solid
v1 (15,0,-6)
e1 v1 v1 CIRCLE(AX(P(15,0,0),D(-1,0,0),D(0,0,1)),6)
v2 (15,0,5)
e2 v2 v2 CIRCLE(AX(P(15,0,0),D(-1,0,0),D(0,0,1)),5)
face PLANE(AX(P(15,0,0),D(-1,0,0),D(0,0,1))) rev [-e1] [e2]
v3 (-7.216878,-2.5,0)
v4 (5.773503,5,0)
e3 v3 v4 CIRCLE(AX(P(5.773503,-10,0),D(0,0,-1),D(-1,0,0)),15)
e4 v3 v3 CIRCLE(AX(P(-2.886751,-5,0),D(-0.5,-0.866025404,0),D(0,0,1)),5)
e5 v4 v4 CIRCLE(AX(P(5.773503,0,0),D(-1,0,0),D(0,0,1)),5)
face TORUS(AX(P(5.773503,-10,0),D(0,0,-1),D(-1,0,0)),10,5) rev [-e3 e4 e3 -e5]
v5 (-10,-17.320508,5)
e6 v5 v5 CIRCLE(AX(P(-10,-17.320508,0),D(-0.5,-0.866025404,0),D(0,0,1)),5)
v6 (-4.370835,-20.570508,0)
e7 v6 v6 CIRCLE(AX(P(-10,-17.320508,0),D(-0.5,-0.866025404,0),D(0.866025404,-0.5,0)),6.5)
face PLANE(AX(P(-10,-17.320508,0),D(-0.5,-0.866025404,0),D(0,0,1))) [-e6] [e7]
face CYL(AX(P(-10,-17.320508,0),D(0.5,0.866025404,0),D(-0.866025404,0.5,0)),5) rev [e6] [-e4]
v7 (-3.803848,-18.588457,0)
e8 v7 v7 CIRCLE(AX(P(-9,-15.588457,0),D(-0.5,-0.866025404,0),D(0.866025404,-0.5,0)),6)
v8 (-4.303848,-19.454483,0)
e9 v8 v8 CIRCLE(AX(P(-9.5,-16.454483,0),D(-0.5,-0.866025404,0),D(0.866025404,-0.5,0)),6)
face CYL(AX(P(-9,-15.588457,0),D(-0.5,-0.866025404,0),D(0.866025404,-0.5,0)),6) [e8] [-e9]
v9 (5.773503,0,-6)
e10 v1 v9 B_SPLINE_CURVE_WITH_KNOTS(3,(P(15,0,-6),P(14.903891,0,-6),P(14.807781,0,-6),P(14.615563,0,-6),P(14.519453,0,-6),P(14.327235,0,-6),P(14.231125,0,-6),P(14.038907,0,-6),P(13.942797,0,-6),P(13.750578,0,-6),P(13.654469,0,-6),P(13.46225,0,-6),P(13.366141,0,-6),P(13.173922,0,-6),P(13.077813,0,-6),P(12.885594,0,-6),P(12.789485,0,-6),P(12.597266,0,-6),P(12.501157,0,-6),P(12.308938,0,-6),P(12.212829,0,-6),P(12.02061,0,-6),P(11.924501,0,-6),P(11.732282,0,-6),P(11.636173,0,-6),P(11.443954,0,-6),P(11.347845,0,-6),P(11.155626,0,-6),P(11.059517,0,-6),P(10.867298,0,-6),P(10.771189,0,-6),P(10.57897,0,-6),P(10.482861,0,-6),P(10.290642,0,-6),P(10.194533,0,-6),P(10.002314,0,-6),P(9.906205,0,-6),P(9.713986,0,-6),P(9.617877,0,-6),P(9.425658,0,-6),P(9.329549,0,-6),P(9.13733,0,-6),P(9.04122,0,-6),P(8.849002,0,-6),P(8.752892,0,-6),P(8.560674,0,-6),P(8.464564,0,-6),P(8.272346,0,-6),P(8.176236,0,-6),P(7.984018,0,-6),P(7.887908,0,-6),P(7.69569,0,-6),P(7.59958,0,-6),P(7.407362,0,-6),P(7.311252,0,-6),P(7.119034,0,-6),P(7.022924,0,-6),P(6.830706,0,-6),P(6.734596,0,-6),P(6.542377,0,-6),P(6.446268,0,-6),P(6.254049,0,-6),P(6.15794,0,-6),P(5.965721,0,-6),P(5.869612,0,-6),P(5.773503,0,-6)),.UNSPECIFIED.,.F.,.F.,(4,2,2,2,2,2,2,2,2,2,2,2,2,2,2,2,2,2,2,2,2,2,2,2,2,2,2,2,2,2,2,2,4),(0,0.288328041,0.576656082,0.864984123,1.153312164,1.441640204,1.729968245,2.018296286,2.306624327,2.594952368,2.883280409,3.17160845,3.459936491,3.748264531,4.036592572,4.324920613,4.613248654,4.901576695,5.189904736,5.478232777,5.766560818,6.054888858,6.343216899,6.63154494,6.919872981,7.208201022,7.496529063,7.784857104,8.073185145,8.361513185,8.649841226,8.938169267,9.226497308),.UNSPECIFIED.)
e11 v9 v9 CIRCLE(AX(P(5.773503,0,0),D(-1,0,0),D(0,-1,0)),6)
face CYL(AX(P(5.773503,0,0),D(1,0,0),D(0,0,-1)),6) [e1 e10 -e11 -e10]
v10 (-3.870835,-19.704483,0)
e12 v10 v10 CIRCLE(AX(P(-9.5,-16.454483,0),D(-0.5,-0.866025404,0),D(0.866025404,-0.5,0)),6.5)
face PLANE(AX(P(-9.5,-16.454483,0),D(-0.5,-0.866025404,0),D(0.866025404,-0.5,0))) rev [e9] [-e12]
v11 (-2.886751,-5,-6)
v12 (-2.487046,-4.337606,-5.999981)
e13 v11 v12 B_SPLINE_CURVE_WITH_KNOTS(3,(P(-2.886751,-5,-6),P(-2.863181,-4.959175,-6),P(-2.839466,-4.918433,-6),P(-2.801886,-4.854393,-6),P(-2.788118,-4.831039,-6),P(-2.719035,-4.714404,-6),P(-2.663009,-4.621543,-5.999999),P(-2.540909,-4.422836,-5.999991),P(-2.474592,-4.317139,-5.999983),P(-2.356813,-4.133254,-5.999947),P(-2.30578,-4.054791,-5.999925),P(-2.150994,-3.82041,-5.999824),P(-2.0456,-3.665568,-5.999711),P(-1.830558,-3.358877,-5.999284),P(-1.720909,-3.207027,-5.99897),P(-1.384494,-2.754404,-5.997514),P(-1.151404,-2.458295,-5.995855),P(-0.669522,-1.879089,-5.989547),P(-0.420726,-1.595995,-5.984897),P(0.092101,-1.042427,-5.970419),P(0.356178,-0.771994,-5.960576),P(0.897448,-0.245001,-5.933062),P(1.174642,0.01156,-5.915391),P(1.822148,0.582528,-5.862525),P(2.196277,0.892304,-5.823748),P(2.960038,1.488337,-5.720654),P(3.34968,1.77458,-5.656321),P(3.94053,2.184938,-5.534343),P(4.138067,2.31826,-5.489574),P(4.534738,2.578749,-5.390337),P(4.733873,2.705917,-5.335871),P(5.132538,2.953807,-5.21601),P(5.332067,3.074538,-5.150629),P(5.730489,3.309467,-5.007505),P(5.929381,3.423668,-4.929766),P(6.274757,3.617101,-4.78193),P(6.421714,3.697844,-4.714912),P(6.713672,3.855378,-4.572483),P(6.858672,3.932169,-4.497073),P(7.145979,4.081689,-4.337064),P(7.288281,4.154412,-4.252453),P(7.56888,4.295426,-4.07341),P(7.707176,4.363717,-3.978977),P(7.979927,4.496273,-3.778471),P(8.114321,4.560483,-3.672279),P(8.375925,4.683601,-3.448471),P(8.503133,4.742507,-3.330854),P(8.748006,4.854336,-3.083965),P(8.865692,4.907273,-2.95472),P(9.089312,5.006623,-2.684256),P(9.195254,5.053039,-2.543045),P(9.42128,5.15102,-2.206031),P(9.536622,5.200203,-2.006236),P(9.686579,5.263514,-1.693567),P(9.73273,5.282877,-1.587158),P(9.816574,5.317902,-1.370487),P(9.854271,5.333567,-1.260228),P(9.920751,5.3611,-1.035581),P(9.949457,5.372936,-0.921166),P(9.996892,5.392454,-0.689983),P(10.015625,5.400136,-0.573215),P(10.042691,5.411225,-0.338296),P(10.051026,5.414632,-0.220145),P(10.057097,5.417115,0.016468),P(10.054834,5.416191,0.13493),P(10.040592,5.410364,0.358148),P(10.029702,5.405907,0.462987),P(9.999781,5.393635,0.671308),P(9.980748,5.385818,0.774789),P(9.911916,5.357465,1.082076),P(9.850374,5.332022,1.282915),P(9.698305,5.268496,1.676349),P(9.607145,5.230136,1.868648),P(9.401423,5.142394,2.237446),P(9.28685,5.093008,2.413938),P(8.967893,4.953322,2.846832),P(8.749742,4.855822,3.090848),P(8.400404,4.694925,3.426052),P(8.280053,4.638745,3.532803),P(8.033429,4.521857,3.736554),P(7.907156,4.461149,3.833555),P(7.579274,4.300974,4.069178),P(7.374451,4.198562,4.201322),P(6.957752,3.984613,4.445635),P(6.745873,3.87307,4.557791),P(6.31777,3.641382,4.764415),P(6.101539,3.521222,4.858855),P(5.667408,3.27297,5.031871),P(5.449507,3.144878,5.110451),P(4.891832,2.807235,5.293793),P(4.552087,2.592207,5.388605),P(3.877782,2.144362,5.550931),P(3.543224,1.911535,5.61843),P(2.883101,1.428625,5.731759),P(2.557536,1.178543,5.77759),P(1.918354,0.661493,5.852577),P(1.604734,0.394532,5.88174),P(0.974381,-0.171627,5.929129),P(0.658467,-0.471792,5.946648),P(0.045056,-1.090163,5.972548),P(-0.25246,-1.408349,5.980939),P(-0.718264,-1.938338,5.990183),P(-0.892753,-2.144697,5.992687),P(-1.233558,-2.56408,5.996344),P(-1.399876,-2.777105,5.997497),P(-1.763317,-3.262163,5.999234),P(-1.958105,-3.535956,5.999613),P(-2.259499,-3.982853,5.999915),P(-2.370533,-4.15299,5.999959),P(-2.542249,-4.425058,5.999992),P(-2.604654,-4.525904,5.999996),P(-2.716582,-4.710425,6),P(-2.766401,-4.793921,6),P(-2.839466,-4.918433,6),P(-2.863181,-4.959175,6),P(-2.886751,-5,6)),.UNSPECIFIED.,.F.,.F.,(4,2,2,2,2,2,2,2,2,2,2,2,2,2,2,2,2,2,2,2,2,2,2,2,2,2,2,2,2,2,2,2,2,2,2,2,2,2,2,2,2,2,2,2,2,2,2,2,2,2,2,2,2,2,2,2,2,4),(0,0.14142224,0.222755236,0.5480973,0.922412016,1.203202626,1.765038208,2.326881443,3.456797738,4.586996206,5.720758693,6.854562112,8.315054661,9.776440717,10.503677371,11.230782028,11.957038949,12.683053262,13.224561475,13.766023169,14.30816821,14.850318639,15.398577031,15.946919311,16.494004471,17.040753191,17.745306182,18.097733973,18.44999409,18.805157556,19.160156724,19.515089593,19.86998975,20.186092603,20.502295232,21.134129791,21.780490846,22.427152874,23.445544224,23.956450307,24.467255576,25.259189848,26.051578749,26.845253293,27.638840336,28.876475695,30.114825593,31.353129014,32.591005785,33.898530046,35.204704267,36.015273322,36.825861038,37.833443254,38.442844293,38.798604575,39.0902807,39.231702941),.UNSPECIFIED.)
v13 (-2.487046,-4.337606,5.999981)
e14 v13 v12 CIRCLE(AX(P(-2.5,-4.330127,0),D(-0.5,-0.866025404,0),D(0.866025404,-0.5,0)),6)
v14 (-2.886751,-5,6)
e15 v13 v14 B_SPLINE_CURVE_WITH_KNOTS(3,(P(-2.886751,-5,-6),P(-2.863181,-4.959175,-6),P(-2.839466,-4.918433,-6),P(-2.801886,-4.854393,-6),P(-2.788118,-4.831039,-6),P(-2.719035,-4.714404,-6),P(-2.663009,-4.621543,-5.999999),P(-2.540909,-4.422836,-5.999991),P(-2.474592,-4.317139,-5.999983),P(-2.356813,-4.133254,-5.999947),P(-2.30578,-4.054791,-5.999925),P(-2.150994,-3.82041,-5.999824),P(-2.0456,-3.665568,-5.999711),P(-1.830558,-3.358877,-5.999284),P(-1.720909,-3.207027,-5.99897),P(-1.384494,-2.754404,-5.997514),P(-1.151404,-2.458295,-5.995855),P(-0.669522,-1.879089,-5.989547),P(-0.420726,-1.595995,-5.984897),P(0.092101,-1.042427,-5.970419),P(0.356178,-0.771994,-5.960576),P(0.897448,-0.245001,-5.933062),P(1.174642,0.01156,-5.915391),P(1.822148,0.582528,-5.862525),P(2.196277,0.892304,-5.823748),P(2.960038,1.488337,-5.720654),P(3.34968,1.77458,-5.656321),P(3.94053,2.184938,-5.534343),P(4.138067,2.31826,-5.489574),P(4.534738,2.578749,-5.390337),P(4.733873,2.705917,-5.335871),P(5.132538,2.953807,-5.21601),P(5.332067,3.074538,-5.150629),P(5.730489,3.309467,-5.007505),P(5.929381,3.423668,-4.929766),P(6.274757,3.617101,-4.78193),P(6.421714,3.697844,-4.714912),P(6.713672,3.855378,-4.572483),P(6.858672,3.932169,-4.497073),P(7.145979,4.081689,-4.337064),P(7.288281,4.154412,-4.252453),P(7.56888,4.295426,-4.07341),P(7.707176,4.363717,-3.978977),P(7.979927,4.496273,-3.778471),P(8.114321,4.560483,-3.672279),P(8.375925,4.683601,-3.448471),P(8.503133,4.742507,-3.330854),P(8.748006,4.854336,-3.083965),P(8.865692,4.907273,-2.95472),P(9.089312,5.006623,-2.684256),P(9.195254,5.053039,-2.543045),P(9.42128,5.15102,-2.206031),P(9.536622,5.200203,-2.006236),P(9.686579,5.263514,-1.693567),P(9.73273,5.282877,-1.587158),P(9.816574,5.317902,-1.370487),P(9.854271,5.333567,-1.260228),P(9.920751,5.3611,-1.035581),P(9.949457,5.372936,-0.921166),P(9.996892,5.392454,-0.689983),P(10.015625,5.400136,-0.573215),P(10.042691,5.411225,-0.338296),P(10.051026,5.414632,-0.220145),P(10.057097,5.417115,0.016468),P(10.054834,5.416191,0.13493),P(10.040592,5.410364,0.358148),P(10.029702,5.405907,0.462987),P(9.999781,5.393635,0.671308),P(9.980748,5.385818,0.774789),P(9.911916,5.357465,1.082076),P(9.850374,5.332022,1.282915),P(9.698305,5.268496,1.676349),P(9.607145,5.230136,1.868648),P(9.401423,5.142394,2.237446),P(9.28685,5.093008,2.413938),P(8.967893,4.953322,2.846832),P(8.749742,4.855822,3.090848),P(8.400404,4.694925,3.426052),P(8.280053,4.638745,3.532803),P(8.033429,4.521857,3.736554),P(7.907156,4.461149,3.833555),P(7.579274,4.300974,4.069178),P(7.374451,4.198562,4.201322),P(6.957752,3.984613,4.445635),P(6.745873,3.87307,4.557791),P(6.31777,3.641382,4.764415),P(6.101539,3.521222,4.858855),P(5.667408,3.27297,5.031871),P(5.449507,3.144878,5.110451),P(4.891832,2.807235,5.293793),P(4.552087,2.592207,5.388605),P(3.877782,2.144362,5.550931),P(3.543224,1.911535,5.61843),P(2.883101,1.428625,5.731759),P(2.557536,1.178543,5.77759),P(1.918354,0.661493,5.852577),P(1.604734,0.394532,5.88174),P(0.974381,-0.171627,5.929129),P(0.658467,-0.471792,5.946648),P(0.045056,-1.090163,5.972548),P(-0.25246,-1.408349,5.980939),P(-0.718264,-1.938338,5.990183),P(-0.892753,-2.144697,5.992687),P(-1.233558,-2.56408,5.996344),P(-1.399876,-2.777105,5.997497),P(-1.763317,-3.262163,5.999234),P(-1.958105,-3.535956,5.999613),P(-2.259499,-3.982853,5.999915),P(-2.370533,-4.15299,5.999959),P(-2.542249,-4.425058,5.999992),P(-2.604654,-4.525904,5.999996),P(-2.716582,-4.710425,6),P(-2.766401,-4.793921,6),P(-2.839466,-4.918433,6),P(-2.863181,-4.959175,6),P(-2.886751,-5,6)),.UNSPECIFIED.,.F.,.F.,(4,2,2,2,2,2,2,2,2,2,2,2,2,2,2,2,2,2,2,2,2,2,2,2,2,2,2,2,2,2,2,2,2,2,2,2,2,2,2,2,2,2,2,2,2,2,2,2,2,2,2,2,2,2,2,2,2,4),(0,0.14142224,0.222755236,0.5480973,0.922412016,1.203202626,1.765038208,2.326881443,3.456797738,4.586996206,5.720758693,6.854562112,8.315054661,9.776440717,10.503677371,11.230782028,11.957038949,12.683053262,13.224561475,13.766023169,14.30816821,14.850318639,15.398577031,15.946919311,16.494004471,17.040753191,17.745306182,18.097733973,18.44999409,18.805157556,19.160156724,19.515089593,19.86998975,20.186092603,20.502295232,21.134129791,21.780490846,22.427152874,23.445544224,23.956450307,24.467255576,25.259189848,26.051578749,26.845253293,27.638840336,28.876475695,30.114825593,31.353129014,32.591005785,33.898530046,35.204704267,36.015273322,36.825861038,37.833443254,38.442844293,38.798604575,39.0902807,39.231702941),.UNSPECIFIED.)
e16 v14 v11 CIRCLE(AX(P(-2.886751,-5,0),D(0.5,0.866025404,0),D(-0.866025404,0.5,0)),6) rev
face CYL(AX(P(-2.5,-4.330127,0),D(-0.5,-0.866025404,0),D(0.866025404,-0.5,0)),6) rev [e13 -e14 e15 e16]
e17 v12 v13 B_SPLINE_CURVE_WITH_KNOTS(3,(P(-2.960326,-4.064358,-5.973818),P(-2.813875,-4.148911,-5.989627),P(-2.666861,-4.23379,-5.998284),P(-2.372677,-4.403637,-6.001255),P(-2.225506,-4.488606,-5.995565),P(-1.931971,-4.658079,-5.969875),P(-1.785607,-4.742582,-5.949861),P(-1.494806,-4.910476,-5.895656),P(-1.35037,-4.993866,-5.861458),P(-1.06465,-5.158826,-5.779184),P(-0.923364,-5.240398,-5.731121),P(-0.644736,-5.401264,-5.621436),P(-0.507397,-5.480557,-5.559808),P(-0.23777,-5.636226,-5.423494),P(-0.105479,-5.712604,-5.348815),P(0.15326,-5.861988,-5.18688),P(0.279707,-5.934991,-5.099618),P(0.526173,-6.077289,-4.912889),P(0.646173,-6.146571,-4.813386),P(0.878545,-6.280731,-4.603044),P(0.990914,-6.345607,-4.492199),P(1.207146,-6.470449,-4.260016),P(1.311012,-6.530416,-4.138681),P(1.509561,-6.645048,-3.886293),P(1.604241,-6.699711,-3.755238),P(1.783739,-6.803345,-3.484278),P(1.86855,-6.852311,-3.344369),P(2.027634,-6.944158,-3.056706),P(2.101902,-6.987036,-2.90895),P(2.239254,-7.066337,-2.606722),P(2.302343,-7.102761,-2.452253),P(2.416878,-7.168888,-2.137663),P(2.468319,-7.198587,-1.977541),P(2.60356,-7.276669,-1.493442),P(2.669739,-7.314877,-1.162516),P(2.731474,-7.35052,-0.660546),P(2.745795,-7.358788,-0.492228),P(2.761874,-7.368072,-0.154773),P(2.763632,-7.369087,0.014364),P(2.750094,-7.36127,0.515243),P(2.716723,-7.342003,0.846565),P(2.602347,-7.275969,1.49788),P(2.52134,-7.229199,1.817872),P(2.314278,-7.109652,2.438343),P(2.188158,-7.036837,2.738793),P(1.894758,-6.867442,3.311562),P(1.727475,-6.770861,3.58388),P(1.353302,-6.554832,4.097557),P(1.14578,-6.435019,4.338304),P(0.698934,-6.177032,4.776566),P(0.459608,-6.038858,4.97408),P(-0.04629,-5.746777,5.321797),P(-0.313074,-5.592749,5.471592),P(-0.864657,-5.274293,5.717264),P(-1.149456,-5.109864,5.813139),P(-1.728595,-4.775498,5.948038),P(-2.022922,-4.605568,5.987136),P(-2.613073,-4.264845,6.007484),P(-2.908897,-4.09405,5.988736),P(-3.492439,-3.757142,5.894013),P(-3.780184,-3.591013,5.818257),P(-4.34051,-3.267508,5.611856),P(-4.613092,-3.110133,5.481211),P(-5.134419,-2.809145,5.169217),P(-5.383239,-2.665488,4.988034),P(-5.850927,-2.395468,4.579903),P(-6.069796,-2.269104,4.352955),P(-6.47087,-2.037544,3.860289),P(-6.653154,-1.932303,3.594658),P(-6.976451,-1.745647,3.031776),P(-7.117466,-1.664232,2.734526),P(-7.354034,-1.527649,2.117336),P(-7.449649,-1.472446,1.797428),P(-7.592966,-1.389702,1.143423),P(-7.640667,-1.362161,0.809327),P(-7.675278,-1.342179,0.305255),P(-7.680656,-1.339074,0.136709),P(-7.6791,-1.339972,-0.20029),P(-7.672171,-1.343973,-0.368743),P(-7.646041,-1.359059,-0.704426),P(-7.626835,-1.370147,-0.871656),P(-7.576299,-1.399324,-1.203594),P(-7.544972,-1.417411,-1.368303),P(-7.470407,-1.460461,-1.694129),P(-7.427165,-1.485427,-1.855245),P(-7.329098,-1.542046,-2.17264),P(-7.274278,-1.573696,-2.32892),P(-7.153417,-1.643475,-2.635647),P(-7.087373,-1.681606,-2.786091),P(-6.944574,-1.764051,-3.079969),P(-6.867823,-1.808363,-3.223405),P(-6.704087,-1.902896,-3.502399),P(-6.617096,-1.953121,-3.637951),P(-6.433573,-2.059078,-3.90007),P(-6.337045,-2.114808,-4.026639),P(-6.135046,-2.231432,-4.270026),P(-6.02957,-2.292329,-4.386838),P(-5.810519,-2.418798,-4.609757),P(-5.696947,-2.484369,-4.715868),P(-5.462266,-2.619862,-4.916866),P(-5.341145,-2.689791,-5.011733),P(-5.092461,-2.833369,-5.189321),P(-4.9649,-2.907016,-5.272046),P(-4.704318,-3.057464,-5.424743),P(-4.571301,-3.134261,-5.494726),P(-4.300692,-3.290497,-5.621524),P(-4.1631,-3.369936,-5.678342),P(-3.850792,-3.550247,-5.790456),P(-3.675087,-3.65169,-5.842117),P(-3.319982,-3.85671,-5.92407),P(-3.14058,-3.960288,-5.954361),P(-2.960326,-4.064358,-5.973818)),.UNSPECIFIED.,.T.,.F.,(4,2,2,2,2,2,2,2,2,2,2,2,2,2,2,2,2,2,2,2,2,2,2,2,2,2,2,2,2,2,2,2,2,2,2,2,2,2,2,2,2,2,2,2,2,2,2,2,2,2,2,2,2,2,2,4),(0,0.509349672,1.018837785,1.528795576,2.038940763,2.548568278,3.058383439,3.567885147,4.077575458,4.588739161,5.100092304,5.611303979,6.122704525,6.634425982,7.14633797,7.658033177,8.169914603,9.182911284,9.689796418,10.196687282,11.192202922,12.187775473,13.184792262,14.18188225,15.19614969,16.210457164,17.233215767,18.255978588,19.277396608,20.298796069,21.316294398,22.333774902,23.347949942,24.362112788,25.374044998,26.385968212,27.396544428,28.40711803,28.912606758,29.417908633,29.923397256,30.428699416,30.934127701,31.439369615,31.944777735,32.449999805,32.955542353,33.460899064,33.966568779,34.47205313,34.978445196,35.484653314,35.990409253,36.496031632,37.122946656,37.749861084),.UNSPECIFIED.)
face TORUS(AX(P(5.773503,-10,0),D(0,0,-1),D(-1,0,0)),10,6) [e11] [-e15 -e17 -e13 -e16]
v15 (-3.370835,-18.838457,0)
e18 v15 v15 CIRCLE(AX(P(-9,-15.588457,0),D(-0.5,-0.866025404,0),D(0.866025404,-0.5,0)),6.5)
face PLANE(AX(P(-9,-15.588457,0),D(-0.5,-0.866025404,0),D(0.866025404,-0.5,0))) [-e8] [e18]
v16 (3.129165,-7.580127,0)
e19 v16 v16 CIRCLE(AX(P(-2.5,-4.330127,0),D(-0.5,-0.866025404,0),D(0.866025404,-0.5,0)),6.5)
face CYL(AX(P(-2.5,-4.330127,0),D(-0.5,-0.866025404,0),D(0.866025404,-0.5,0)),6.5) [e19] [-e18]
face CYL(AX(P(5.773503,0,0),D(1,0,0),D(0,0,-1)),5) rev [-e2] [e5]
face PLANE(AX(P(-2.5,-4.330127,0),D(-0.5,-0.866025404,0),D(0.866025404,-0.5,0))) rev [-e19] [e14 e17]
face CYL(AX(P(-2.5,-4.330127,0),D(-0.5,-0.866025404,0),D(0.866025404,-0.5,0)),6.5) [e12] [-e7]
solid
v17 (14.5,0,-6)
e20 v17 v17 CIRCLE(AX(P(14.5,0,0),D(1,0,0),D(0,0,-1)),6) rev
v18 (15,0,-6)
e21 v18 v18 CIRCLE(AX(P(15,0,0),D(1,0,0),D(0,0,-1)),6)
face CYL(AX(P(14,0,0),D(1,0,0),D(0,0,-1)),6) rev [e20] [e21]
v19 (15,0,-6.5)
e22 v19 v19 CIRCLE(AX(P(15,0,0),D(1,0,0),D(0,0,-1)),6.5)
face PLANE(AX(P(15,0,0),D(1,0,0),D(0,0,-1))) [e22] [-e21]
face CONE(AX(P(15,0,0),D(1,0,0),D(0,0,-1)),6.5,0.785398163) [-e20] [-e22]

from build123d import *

# Parameters (mm, degrees)
SWEEP_THIN1_PROFILE_R   = 6
SWEEP_THIN1_PROFILE_R_2 = 5
BOSS_EXTRUDE1_START     = -15
SKETCH17_R              = 6.5
SKETCH17_R_2            = 6
BOSS_EXTRUDE1_DEPTH     = 15
CUT_EXTRUDE1_START      = -2
SKETCH17_3_R            = 6.5
SKETCH17_3_R_2          = 6
CUT_EXTRUDE1_DEPTH      = 1
SKETCH18_R              = 6.5
SKETCH18_R_2            = 6
BOSS_EXTRUDE2_DEPTH     = 1


with BuildPart() as part:
    # Sweep-Thin1: sweep along a path in Sketch1
    with BuildLine(Plane.XY) as sweep_thin1_path:
        Line((-10, -17.320508076), (-2.886751346, -5))
        ThreePointArc((-2.886751346, -5), (0.773502692, -1.339745962), (5.773502692, 0))
        Line((5.773502692, 0), (15, 0))
    # Sweep-Thin1 profile (on start of the path) → Sweep-Thin1 (sweep)
    with BuildSketch(Plane(origin=(-10, -17.320508076, 0), x_dir=(0.8660254037844363, -0.5000000000000041, 0), z_dir=(0.5000000000000041, 0.8660254037844363, 0))):
        Circle(SWEEP_THIN1_PROFILE_R)
        Circle(SWEEP_THIN1_PROFILE_R_2, mode=Mode.SUBTRACT)
    sweep(path=sweep_thin1_path.line)

    # Sketch17 → Boss-Extrude1 (add)
    with BuildSketch(Plane(origin=(-10, -17.320508076, 0), x_dir=(0.8660254037844363, -0.5000000000000042, 0), z_dir=(-0.5000000000000041, -0.8660254037844362, 0)).offset(BOSS_EXTRUDE1_START)):
        Circle(SKETCH17_R)
        Circle(SKETCH17_R_2, mode=Mode.SUBTRACT)
    extrude(amount=BOSS_EXTRUDE1_DEPTH)

    # Sketch17<3> → Cut-Extrude1 (cut)
    with BuildSketch(Plane(origin=(-10, -17.320508076, 0), x_dir=(0.8660254037844363, -0.5000000000000042, 0), z_dir=(-0.5000000000000041, -0.8660254037844362, 0)).offset(CUT_EXTRUDE1_START)):
        Circle(SKETCH17_3_R)
        Circle(SKETCH17_3_R_2, mode=Mode.SUBTRACT)
    extrude(amount=CUT_EXTRUDE1_DEPTH, mode=Mode.SUBTRACT)


with BuildPart() as body_2:
    # Sketch18 → Boss-Extrude2 (new body)
    with BuildSketch(Plane(origin=(15, 0, 0), x_dir=(0, 0, -1), z_dir=(1, 0, 0))):
        Circle(SKETCH18_R)
        Circle(SKETCH18_R_2, mode=Mode.SUBTRACT)
    extrude(amount=-BOSS_EXTRUDE2_DEPTH)

    # Chamfer1: read off the stored shape, not the designer's step
    # Chamfer1 outline → Chamfer1 (revolve, cut)
    with BuildSketch(Plane.YX):
        Polygon((6.5, 15), (6, 14.5), (6, 14), (6.5, 14), align=None)
    revolve(axis=Axis((0, 0, 0), (1, 0, 0)), mode=Mode.SUBTRACT)


solid = Compound([part.part, body_2.part])
